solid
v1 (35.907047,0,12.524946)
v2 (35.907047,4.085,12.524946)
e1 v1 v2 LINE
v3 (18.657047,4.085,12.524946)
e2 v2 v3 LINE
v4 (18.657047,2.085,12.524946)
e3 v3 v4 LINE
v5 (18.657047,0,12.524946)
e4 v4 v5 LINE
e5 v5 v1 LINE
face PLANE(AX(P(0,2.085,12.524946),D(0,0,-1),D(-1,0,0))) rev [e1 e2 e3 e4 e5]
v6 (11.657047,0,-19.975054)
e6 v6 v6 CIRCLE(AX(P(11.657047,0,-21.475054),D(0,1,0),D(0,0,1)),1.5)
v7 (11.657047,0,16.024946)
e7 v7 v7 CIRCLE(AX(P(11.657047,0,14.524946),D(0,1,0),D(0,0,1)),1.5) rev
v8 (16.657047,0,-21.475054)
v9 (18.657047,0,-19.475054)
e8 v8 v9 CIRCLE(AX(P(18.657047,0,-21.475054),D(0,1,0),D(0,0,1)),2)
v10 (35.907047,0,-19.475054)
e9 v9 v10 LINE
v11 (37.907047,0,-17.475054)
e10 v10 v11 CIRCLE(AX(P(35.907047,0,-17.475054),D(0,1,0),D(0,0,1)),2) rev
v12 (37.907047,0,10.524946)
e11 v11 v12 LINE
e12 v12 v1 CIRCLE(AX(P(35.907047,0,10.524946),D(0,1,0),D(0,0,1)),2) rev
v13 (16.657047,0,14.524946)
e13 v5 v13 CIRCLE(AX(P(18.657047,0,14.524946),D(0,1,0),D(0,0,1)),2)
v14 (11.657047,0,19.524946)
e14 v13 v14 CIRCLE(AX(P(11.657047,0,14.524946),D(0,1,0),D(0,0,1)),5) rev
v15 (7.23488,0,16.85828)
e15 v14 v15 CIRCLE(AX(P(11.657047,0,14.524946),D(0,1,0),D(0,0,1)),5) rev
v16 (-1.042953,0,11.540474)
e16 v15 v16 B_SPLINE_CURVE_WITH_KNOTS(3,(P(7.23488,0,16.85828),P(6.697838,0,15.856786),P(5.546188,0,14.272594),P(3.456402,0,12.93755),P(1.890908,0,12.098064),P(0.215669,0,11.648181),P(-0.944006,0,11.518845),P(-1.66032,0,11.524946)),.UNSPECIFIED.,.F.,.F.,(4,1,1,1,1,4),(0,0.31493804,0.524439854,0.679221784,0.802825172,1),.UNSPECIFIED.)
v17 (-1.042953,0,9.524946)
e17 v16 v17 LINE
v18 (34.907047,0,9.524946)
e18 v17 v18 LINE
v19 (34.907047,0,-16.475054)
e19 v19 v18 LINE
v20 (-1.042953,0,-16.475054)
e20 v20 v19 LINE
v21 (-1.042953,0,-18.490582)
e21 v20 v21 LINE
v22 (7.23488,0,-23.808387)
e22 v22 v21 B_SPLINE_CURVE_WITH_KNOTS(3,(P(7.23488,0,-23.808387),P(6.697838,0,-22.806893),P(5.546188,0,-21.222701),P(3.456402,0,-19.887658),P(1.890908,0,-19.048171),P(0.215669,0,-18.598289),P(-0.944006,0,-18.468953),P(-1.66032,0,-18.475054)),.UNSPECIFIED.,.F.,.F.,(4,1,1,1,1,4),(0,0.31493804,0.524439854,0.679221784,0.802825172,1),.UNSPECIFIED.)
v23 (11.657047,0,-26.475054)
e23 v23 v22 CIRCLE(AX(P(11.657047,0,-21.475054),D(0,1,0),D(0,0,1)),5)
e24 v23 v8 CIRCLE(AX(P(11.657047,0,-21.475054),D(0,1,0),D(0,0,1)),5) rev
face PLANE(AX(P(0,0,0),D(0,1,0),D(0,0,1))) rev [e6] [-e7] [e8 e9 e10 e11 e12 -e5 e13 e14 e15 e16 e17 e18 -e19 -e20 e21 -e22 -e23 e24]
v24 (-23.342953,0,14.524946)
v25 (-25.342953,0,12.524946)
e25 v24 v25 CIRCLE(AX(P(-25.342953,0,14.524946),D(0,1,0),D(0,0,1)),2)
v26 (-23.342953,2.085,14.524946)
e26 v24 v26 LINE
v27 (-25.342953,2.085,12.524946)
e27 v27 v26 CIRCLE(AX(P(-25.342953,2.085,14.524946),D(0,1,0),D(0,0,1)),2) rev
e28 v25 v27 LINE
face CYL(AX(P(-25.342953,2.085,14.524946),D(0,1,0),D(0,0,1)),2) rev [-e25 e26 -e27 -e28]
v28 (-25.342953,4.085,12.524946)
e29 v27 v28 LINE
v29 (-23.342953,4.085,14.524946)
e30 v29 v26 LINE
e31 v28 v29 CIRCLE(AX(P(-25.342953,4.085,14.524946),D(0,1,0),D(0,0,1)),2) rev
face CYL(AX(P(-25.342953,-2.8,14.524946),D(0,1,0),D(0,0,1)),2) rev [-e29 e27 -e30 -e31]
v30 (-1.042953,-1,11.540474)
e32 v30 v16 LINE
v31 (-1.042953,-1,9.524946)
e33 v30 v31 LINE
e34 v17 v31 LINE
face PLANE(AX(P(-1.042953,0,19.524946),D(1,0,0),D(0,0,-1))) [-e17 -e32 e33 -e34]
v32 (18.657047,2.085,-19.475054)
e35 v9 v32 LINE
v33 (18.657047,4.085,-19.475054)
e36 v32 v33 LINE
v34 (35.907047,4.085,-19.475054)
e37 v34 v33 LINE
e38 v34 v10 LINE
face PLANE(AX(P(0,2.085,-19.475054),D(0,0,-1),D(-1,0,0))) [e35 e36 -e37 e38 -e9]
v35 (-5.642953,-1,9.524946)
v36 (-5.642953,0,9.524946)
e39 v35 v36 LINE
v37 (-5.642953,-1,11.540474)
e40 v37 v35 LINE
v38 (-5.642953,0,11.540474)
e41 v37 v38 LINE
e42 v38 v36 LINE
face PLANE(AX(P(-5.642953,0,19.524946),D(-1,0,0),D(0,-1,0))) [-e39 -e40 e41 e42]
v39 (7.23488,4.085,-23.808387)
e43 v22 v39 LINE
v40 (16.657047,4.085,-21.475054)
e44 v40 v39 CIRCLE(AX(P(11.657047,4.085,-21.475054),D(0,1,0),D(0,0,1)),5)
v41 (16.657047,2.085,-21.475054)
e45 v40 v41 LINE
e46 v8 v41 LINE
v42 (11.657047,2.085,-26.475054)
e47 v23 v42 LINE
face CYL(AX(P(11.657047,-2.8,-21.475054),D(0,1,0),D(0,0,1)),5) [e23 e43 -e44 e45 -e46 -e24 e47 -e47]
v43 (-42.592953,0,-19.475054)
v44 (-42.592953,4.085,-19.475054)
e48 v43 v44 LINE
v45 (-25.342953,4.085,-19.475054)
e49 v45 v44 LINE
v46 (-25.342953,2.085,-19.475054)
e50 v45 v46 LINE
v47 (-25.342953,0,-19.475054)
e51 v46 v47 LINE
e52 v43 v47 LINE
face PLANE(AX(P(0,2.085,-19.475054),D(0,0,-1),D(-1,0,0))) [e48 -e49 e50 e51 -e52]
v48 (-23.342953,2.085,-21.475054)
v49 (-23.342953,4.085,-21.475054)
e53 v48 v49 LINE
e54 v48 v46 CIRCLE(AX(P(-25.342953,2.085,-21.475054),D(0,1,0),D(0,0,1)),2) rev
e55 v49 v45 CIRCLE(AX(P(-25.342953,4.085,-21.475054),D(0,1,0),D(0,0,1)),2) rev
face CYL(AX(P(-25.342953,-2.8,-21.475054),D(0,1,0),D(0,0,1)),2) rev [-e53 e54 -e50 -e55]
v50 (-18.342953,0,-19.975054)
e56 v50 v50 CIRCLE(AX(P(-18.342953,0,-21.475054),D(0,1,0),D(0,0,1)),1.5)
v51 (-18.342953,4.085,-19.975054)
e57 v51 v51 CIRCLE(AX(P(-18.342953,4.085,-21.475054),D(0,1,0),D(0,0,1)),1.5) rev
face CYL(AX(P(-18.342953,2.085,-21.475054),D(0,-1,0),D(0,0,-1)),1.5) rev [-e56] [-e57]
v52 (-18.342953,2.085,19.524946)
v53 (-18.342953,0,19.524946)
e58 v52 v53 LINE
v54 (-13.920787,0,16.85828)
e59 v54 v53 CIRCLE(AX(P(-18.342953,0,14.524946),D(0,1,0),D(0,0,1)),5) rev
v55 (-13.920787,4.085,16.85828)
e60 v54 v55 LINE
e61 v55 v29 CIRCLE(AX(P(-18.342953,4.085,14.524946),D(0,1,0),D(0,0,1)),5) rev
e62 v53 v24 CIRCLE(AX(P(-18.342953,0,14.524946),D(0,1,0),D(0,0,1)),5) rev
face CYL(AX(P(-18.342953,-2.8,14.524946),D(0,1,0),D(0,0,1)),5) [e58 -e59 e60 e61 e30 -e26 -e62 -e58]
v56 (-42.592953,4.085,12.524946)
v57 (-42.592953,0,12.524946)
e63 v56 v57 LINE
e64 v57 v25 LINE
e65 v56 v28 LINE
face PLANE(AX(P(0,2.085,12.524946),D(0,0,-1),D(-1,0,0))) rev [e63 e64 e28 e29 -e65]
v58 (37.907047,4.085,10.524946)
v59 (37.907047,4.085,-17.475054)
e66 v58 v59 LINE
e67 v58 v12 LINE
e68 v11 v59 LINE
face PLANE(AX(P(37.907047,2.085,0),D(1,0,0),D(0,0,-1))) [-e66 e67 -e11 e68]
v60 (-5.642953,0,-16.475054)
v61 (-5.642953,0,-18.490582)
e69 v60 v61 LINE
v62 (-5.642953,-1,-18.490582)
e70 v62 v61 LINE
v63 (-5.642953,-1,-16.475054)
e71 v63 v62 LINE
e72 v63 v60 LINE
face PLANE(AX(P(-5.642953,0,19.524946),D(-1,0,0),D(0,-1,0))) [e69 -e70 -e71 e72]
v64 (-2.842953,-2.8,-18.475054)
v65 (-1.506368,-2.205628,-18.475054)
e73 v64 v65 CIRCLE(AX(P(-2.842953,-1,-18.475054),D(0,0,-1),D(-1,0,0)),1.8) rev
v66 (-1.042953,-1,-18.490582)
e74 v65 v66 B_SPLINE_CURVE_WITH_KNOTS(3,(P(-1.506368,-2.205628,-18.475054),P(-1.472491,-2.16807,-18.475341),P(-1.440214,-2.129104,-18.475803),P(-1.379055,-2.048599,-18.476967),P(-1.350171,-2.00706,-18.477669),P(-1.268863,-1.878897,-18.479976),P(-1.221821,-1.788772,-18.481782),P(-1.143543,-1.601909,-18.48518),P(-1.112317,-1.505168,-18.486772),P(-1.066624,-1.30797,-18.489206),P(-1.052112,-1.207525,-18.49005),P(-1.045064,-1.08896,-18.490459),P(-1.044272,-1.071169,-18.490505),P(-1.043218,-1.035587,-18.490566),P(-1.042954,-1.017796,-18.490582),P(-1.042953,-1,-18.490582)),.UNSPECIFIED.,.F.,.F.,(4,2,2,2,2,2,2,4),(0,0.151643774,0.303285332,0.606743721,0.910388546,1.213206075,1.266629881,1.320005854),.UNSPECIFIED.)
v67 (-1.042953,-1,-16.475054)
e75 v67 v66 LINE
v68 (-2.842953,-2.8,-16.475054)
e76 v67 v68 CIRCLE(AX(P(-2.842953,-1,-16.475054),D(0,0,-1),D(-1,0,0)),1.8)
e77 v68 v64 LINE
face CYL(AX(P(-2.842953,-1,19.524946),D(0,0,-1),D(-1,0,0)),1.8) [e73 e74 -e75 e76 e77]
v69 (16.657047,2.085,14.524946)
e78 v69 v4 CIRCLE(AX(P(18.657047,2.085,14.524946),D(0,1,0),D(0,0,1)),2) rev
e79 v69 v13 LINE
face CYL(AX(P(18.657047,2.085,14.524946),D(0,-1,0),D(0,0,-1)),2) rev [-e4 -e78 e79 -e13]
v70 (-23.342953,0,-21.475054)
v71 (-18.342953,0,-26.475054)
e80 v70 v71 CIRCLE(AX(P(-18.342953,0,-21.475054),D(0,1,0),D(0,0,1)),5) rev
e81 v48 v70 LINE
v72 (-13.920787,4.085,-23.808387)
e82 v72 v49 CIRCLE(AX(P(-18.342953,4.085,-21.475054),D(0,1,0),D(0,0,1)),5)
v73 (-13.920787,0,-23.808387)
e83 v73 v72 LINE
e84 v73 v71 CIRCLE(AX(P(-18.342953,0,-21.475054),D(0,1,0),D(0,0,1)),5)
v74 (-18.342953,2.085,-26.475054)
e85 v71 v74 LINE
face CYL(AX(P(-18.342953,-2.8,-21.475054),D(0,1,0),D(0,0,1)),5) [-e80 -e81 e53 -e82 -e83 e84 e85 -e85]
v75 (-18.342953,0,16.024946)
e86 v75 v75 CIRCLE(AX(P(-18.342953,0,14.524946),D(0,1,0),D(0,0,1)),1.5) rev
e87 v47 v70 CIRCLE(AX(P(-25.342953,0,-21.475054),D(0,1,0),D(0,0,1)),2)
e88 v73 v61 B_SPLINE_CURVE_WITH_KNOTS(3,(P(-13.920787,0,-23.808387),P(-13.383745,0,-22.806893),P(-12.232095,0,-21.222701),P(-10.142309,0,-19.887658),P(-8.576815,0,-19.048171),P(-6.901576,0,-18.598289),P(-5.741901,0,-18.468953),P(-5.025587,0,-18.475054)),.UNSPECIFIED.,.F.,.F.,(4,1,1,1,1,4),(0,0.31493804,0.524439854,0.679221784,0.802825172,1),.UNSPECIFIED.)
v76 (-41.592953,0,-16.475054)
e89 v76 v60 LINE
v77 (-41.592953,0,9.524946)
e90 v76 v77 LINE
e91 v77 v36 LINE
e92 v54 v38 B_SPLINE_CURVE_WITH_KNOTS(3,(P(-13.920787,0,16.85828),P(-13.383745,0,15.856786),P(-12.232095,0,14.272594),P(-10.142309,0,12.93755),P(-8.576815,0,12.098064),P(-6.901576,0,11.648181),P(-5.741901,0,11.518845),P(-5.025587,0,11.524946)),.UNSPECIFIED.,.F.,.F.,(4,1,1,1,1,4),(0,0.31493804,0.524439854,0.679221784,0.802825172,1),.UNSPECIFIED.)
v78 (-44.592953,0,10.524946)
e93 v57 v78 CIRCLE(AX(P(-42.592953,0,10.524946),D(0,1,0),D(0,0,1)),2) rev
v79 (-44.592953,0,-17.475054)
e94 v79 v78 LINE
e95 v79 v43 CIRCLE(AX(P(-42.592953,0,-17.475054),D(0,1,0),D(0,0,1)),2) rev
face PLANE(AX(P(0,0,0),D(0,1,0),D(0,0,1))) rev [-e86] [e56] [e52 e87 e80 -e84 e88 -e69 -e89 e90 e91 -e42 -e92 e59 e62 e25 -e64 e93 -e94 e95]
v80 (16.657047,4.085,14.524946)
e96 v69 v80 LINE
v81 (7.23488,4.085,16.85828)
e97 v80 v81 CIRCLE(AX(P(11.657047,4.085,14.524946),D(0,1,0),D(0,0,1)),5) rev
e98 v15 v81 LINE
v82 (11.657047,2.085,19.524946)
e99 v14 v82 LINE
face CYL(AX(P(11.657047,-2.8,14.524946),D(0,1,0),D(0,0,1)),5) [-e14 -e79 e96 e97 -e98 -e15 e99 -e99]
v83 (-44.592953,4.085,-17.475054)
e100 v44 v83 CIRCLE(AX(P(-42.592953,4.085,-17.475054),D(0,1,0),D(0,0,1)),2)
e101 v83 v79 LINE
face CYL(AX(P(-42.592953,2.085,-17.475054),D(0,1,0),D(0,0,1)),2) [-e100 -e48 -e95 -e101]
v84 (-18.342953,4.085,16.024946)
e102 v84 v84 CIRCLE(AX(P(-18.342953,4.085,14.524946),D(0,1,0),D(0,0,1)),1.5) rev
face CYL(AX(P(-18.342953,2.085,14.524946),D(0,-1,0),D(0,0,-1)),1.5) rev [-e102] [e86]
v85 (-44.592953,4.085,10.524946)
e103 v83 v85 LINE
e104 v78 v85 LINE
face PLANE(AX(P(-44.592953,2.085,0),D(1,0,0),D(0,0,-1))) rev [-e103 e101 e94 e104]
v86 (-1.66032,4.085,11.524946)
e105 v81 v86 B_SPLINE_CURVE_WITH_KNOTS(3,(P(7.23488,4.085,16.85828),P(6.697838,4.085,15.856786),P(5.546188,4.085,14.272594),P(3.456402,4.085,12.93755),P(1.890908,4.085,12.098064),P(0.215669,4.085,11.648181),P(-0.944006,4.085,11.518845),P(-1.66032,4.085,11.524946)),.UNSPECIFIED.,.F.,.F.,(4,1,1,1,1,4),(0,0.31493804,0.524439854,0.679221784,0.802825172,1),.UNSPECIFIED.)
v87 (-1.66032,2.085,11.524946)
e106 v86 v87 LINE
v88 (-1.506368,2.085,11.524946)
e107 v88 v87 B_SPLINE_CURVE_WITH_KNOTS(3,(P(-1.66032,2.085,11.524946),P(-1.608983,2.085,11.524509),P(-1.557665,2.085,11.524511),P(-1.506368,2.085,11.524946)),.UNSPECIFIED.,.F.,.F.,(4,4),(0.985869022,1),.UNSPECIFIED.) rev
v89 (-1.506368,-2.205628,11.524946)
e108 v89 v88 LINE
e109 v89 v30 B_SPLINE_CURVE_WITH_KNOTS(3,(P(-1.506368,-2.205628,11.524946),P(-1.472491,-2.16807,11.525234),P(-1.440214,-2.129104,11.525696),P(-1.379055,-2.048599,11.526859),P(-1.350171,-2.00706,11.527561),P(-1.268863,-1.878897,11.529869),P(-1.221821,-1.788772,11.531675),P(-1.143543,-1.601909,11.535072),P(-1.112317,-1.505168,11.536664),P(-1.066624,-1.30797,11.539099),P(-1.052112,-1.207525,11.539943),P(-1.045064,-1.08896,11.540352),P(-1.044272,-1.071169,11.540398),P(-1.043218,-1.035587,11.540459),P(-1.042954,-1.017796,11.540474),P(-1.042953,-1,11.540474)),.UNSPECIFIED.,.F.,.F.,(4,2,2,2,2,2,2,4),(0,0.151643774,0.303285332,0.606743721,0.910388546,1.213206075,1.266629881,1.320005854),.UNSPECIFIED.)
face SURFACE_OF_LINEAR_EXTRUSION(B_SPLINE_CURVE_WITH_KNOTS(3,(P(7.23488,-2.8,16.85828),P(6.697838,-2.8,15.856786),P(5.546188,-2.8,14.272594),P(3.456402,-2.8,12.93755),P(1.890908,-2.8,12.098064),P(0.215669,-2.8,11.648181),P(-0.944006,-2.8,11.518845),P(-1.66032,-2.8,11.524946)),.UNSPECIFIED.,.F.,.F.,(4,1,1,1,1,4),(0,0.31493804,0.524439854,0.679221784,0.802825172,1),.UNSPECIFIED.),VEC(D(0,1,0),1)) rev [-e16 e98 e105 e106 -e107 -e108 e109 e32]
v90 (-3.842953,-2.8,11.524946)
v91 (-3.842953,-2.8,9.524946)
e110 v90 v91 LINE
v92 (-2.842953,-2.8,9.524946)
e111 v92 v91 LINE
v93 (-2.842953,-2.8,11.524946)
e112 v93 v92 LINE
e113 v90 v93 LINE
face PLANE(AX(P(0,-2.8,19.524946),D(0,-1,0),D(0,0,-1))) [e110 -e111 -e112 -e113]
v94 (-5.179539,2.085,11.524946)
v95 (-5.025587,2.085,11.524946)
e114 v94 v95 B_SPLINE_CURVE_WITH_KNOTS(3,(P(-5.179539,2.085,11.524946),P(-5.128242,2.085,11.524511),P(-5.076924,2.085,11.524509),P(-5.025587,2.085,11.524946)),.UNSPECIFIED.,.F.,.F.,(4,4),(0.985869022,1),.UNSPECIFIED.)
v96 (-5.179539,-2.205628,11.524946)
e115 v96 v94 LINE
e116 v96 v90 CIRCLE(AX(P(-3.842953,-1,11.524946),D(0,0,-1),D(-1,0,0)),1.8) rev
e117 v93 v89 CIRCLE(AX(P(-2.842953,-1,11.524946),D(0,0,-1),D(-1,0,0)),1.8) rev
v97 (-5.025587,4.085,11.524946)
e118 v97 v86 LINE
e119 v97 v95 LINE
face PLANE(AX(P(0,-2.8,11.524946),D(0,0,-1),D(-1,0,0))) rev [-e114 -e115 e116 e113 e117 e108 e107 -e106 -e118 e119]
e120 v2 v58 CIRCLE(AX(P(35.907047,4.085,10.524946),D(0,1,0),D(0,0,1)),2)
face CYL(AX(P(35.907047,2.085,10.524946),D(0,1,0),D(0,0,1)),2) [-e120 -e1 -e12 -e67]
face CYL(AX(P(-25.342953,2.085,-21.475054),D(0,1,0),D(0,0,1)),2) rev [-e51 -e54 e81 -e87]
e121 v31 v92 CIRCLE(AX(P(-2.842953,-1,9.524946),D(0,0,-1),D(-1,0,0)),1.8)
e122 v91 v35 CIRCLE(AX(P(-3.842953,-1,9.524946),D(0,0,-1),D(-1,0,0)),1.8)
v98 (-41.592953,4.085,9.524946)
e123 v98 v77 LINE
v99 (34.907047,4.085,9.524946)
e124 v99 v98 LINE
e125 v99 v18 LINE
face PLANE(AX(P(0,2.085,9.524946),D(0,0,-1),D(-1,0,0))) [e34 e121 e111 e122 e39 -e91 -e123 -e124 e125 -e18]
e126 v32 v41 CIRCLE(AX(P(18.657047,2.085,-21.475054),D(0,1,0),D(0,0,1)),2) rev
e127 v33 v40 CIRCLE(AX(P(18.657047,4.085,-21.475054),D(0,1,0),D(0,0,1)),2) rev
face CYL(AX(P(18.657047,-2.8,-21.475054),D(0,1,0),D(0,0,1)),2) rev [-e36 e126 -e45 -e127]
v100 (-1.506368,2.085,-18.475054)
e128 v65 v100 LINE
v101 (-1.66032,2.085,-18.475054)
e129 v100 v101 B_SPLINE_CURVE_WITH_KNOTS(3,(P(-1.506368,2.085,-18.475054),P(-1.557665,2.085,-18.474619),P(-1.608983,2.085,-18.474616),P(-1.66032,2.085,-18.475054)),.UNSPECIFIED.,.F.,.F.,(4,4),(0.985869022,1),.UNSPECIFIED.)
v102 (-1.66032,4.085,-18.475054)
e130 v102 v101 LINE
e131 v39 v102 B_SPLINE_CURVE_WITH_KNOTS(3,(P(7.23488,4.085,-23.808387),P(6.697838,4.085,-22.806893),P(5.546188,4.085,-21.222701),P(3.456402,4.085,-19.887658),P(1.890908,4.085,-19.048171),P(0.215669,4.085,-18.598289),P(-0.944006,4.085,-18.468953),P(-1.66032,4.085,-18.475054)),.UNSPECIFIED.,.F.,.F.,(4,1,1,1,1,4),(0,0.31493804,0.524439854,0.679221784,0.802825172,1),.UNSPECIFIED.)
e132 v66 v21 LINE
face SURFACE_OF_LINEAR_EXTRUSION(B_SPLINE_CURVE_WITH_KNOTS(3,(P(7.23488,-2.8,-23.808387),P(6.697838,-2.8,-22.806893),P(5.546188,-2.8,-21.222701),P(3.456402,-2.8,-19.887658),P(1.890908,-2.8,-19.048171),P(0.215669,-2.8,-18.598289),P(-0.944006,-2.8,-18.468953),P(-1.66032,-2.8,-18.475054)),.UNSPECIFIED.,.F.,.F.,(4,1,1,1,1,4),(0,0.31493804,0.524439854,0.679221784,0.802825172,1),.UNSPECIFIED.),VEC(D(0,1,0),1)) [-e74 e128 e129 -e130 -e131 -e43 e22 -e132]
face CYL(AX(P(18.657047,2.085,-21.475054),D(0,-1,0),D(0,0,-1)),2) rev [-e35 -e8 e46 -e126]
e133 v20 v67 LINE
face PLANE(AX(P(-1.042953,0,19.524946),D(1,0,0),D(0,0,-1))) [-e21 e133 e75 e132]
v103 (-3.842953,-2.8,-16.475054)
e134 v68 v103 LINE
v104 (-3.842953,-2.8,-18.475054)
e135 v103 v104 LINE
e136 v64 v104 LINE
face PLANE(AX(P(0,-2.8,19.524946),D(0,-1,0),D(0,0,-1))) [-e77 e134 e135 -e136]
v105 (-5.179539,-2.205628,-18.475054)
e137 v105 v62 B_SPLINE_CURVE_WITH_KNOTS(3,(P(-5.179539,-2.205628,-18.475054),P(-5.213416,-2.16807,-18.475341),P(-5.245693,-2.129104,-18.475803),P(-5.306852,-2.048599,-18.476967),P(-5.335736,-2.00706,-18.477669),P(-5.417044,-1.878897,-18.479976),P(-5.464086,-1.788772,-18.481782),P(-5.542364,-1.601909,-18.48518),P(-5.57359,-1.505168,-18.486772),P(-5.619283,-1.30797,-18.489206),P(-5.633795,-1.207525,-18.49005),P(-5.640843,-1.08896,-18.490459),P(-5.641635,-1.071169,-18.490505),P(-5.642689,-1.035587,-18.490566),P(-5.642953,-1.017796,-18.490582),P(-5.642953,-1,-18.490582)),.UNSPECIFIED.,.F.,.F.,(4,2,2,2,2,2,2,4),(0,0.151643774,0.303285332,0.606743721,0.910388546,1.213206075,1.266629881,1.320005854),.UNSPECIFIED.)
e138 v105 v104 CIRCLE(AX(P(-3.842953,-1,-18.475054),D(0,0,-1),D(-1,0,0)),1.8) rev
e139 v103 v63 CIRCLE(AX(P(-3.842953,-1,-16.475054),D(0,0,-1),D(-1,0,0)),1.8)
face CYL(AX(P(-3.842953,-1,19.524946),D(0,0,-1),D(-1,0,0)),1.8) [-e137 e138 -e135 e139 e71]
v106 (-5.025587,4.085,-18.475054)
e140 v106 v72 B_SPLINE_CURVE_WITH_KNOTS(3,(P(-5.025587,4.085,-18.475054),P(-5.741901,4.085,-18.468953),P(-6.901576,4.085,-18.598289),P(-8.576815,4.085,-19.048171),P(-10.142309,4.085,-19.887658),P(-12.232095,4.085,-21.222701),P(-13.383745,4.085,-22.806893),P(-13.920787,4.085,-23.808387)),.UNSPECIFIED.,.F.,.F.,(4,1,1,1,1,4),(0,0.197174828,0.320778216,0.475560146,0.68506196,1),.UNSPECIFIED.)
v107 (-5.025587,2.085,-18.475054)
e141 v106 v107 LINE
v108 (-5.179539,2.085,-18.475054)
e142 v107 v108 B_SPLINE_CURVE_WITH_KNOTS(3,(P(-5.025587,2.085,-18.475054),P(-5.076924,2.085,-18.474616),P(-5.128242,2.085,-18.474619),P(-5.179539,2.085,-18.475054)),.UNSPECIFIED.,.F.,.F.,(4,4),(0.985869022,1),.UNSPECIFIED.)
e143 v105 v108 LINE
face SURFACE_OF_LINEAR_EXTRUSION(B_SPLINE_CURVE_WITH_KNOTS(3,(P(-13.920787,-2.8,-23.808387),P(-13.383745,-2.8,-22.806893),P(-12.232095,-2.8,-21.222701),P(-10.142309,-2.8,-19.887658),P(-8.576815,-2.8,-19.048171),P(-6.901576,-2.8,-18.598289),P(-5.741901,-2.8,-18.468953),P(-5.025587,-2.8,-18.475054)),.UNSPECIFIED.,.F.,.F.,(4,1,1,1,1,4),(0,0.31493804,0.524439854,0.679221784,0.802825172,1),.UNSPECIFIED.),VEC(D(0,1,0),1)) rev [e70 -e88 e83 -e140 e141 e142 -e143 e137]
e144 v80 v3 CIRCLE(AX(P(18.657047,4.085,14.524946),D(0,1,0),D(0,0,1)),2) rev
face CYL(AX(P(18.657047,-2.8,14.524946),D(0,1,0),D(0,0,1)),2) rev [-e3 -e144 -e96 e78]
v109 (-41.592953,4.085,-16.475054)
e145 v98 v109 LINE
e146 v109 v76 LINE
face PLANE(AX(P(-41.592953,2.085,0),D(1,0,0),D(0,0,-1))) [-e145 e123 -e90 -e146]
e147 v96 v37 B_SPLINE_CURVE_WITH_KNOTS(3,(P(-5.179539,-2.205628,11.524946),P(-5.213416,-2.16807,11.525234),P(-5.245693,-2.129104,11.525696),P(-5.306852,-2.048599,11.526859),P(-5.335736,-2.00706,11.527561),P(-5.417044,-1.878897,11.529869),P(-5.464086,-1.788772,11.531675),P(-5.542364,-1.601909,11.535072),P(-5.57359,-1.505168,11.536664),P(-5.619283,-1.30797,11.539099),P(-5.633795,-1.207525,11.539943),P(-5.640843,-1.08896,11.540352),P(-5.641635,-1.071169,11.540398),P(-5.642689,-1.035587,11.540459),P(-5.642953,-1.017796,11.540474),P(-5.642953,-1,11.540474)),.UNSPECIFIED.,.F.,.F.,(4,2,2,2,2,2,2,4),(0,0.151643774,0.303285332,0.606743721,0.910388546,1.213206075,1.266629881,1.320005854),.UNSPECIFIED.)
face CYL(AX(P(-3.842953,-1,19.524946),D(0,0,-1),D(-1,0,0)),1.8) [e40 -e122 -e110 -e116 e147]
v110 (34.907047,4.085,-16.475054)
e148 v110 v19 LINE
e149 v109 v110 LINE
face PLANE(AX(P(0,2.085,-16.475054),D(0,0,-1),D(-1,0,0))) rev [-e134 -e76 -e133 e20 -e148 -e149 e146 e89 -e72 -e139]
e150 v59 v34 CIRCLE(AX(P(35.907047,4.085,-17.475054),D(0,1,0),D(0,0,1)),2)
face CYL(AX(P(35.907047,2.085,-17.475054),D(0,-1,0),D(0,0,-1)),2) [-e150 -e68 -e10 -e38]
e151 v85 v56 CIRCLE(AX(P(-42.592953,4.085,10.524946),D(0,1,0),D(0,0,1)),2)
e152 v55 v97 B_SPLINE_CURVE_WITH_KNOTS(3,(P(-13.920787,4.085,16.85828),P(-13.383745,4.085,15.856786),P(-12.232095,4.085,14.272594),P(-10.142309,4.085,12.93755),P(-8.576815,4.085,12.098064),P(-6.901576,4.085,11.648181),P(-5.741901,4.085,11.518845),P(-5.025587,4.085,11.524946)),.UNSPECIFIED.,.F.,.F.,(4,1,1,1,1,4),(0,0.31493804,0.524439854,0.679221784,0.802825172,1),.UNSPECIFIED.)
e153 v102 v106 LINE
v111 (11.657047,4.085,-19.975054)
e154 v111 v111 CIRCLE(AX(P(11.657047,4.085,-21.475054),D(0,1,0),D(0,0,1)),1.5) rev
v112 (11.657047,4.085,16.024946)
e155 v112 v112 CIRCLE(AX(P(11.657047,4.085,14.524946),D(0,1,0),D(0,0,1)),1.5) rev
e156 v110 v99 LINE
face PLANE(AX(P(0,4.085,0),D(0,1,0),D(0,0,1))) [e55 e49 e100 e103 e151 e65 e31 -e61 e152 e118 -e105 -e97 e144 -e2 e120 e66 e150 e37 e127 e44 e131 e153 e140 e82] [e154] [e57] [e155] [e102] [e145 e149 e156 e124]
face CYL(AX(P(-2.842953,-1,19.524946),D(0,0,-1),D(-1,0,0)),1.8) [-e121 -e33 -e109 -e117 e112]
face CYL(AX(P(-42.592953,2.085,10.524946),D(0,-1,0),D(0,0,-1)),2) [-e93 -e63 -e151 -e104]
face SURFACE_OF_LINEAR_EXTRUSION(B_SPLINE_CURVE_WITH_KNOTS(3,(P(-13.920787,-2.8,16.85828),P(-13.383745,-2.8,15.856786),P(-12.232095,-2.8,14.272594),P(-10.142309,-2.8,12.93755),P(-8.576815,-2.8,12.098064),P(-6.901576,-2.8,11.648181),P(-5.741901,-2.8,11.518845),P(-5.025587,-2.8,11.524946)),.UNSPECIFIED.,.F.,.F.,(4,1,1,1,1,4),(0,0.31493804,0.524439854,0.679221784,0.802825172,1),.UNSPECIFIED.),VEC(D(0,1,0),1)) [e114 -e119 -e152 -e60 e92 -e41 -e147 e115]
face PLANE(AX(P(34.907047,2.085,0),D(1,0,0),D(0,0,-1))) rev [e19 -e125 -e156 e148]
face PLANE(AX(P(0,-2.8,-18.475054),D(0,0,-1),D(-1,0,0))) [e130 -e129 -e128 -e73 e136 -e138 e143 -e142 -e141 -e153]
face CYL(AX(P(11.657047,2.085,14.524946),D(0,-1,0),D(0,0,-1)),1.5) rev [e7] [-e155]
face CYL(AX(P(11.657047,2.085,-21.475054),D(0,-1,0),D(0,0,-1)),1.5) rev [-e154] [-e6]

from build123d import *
from build123d.topology import SkipClean

# Parameters (mm, degrees)
SKETCH1_W           = 40
SKETCH1_H           = 7
SKETCH1_R           = 1.5
SKETCH1_W_2         = 82.5
SKETCH1_H_2         = 32
SKETCH1_W_3         = 76.5
SKETCH1_H_3         = 26
BOSS_EXTRUDE1_DEPTH = 2.085
SKETCH2_W           = 5
SKETCH2_H           = 10
BOSS_EXTRUDE2_DEPTH = 3
FILLET1_R           = 2
FILLET2_R           = 2
CUT_EXTRUDE1_DEPTH  = 65.136818612
SKETCH4_W           = 30
SKETCH4_H           = 6.817038716
CUT_EXTRUDE2_DEPTH  = 53.089568977
FILLET3_R           = 5
FILLET4_R           = 2
BOSS_EXTRUDE3_START = 2
SKETCH5_R           = 1.5
BOSS_EXTRUDE3_DEPTH = 2
FILLET5_START       = 2.085
FILLET5_DEPTH       = 2


with BuildPart() as part:
    # Sketch1 → Boss-Extrude1 (new body)
    # profile 1 of 3: a face of its own
    with BuildSketch(Plane(origin=(0, 0, 0), x_dir=(1, 0, 0), z_dir=(0, 1, 0))):
        with Locations((-3.342953498, -16.024946279)):
            Rectangle(SKETCH1_W, SKETCH1_H)
        with Locations(Location((-18.342953498, -14.524946279, 0), (0, 0, 270))):
            Circle(SKETCH1_R, mode=Mode.SUBTRACT)
        with Locations(Location((11.657046502, -14.524946279, 0), (0, 0, 270))):
            Circle(SKETCH1_R, mode=Mode.SUBTRACT)
    # profile 2 of 3: a face of its own
    with BuildSketch(Plane(origin=(0, 0, 0), x_dir=(1, 0, 0), z_dir=(0, 1, 0))):
        with Locations((-3.342953498, 3.475053721)):
            Rectangle(SKETCH1_W_2, SKETCH1_H_2)
        with Locations((-3.342953498, 3.475053721)):
            Rectangle(SKETCH1_W_3, SKETCH1_H_3, mode=Mode.SUBTRACT)
    # profile 3 of 3: a face of its own
    with BuildSketch(Plane(origin=(0, 0, 0), x_dir=(1, 0, 0), z_dir=(0, 1, 0))):
        with Locations((-3.342953498, 22.975053721)):
            Rectangle(SKETCH1_W, SKETCH1_H)
        with Locations(Location((-18.342953498, 21.475053721, 0), (0, 0, 270))):
            Circle(SKETCH1_R, mode=Mode.SUBTRACT)
        with Locations(Location((11.657046502, 21.475053721, 0), (0, 0, 270))):
            Circle(SKETCH1_R, mode=Mode.SUBTRACT)
    extrude(amount=BOSS_EXTRUDE1_DEPTH)

    # Sketch2 → Boss-Extrude2 (add)
    with BuildSketch(Plane.XZ):
        with Locations((-3.342953498, 14.524946279)):
            Rectangle(SKETCH2_W, SKETCH2_H)
        with Locations((-3.342953498, -21.475053721)):
            Rectangle(SKETCH2_W, SKETCH2_H)
    extrude(amount=BOSS_EXTRUDE2_DEPTH)

    # Fillet1
    fillet1_edges = [part.edges().sort_by_distance(p)[0] for p in [
        (-5.842953498, -3, 14.524946279),
        (-0.842953498, -3, 14.524946279),
        (-0.842953498, -3, -21.475053721),
        (-5.842953498, -3, -21.475053721),
    ]]
    fillet(fillet1_edges, radius=FILLET1_R)

    # Fillet2
    fillet2_edges = [part.edges().sort_by_distance(p)[0] for p in [
        (-44.592953498, 1.0425, 12.524946279),
        (-44.592953498, 1.0425, -19.475053721),
        (37.907046502, 1.0425, -19.475053721),
        (37.907046502, 1.0425, 12.524946279),
    ]]
    fillet(fillet2_edges, radius=FILLET2_R)

    # Sketch3 → Cut-Extrude1 (cut, through all)
    with BuildSketch(Plane(origin=(0, 0, -26.475053721), x_dir=(-1, 0, 0), z_dir=(0, 0, -1))):
        with BuildLine():
            Line((5.842953498, -1), (5.842953498, 0))
            Line((5.842953498, 0), (5.642953498, 0))
            Line((5.642953498, 0), (5.642953498, -1))
            ThreePointArc((5.642953498, -1), (5.115745704, -2.272792206), (3.842953498, -2.8))
            Line((3.842953498, -2.8), (2.842953498, -2.8))
            ThreePointArc((2.842953498, -2.8), (1.570161291, -2.272792206), (1.042953498, -1))
            Line((1.042953498, -1), (1.042953498, 0))
            Line((1.042953498, 0), (0.842953498, 0))
            Line((0.842953498, 0), (0.842953498, -1))
            ThreePointArc((0.842953498, -1), (1.428739935, -2.414213562), (2.842953498, -3))
            Line((2.842953498, -3), (3.842953498, -3))
            ThreePointArc((3.842953498, -3), (5.25716706, -2.414213562), (5.842953498, -1))
        make_face()
    extrude(amount=-CUT_EXTRUDE1_DEPTH, mode=Mode.SUBTRACT)

    # Sketch4 → Cut-Extrude2 (cut, through all)
    with BuildSketch(Plane(origin=(0, 2.085, 0), x_dir=(1, 0, 0), z_dir=(0, 1, 0))):
        with BuildLine():
            Line((-5.025587433, 18.475053721), (-3.342953498, 18.475053721))
            Line((-3.342953498, 18.475053721), (-1.660319563, 18.475053721))
            Line((-1.660319563, 18.475053721), (-1.5063675, 18.475053721))
            add(Edge.make_bspline(
                [(7.234880115, 23.808387054), (6.697838422, 22.80689338), (5.54618786, 21.222701251), (3.456402004, 19.887657692), (1.890908212, 19.048171258), (0.265447838, 18.611656881), (-0.841891354, 18.480685845), (-1.5063675, 18.475053721)],
                knots=[0, 0, 0, 0, 0.31493804, 0.524439854, 0.679221784, 0.802825172, 0.985869019, 0.985869019, 0.985869019, 0.985869019], degree=3))
            ThreePointArc((7.234880115, 23.808387054), (9.075057605, 25.756797914), (11.657046502, 26.475053721))
            Line((11.657046502, 26.475053721), (-18.342953498, 26.475053721))
            ThreePointArc((-18.342953498, 26.475053721), (-15.7609646, 25.756797914), (-13.92078711, 23.808387054))
            add(Edge.make_bspline(
                [(-13.92078711, 23.808387054), (-13.383745417, 22.80689338), (-12.232094855, 21.222701251), (-10.142308999, 19.887657692), (-8.576815207, 19.048171258), (-6.951354833, 18.611656881), (-5.844015641, 18.480685845), (-5.179539495, 18.475053721)],
                knots=[0, 0, 0, 0, 0.31493804, 0.524439854, 0.679221784, 0.802825172, 0.985869019, 0.985869019, 0.985869019, 0.985869019], degree=3))
            Line((-5.179539495, 18.475053721), (-5.025587433, 18.475053721))
        make_face()
        with Locations((-3.342953498, 29.883573079)):
            Rectangle(SKETCH4_W, SKETCH4_H)
        with BuildLine():
            ThreePointArc((-13.92078711, -16.858279612), (-15.7609646, -18.806690472), (-18.342953498, -19.524946279))
            Line((-18.342953498, -19.524946279), (11.657046502, -19.524946279))
            ThreePointArc((11.657046502, -19.524946279), (9.075057605, -18.806690472), (7.234880115, -16.858279612))
            add(Edge.make_bspline(
                [(7.234880115, -16.858279612), (6.697838422, -15.856785937), (5.54618786, -14.272593809), (3.456402004, -12.937550249), (1.890908212, -12.098063816), (0.265447838, -11.661549439), (-0.841891354, -11.530578403), (-1.5063675, -11.524946279)],
                knots=[0, 0, 0, 0, 0.31493804, 0.524439854, 0.679221784, 0.802825172, 0.985869019, 0.985869019, 0.985869019, 0.985869019], degree=3))
            Line((-1.5063675, -11.524946279), (-1.660319563, -11.524946279))
            Line((-1.660319563, -11.524946279), (-3.342953498, -11.524946279))
            Line((-3.342953498, -11.524946279), (-5.025587433, -11.524946279))
            Line((-5.025587433, -11.524946279), (-5.179539495, -11.524946279))
            add(Edge.make_bspline(
                [(-13.92078711, -16.858279612), (-13.383745417, -15.856785937), (-12.232094855, -14.272593809), (-10.142308999, -12.937550249), (-8.576815207, -12.098063816), (-6.951354833, -11.661549439), (-5.844015641, -11.530578403), (-5.179539495, -11.524946279)],
                knots=[0, 0, 0, 0, 0.31493804, 0.524439854, 0.679221784, 0.802825172, 0.985869019, 0.985869019, 0.985869019, 0.985869019], degree=3))
        make_face()
        with Locations((-3.342953498, -22.933465637)):
            Rectangle(SKETCH4_W, SKETCH4_H)
    extrude(amount=-CUT_EXTRUDE2_DEPTH, mode=Mode.SUBTRACT)

    # Fillet3
    fillet3_edges = [part.edges().sort_by_distance(p)[0] for p in [
        (16.657046502, 1.0425, -26.475053721),
        (-23.342953498, 1.0425, -26.475053721),
        (-23.342953498, 1.0425, 19.524946279),
        (16.657046502, 1.0425, 19.524946279),
    ]]
    fillet(fillet3_edges, radius=FILLET3_R - 0.0001)  # a hair under: the kernel refuses the full size

    # Fillet4
    fillet4_edges = [part.edges().sort_by_distance(p)[0] for p in [
        (-23.342953498, 1.0425, 12.524946279),
        (-23.342953498, 1.0425, -19.475053721),
        (16.657046502, 1.0425, -19.475053721),
        (16.657046502, 1.0425, 12.524946279),
    ]]
    fillet(fillet4_edges, radius=FILLET4_R)

    # Sketch5 → Boss-Extrude3 (add)
    # profile 1 of 26: a face of its own
    with SkipClean():  # the faces are left unmerged after this step: merging them gives an invalid solid
        with BuildSketch(Plane(origin=(0, 2.085, 0), x_dir=(1, 0, 0), z_dir=(0, 1, 0)).offset(BOSS_EXTRUDE3_START)):
            with BuildLine():
                ThreePointArc((-18.343003498, 26.475053721), (-21.878490939, 25.010584091), (-23.342953497, 21.475093721))
                ThreePointArc((-23.342953497, 21.475093721), (-23.237489148, 20.453525081), (-22.925529193, 19.475053721))
                Line((-22.925529193, 19.475053721), (-14.342953498, 19.475053721))
                Line((-14.342953498, 19.475053721), (-14.342953498, 24.475053721))
                ThreePointArc((-14.342953498, 24.475053721), (-16.106907881, 25.947200856), (-18.343003498, 26.475053721))
            make_face()
            with Locations((-18.342953498, 21.475053721)):
                Circle(SKETCH5_R, mode=Mode.SUBTRACT)
        # profile 2 of 26: a face of its own
        with BuildSketch(Plane(origin=(0, 2.085, 0), x_dir=(1, 0, 0), z_dir=(0, 1, 0)).offset(BOSS_EXTRUDE3_START)):
            with BuildLine():
                Line((-22.925529193, 19.475053721), (-23.342953498, 19.475053721))
                Line((-23.342953498, 19.475053721), (-23.342953498, 16.475053721))
                Line((-23.342953498, 16.475053721), (-18.342953499, 16.475053721))
                ThreePointArc((-18.342953499, 16.475053721), (-21.081566286, 17.291753589), (-22.925529193, 19.475053721))
            make_face()
        # profile 3 of 26: a face of its own
        with BuildSketch(Plane(origin=(0, 2.085, 0), x_dir=(1, 0, 0), z_dir=(0, 1, 0)).offset(BOSS_EXTRUDE3_START)):
            with BuildLine():
                Line((-23.342953498, 16.475053721), (-23.342953498, 19.475053721))
                Line((-23.342953498, 19.475053721), (-25.342953498, 19.475053721))
                Line((-25.342953498, 19.475053721), (-42.592953498, 19.475053721))
                ThreePointArc((-42.592953498, 19.475053721), (-44.00716706, 18.889267283), (-44.592953498, 17.475053721))
                Line((-44.592953498, 17.475053721), (-44.592953498, -10.524946279))
                ThreePointArc((-44.592953498, -10.524946279), (-44.00716706, -11.939159841), (-42.592953498, -12.524946279))
                Line((-42.592953498, -12.524946279), (-25.342953498, -12.524946279))
                Line((-25.342953498, -12.524946279), (-23.342953498, -12.524946279))
                Line((-23.342953498, -12.524946279), (-23.342953498, -9.524946279))
                Line((-23.342953498, -9.524946279), (-41.592953498, -9.524946279))
                Line((-41.592953498, -9.524946279), (-41.592953498, 16.475053721))
                Line((-41.592953498, 16.475053721), (-23.342953498, 16.475053721))
            make_face()
        # profile 4 of 26: a face of its own
        with BuildSketch(Plane(origin=(0, 2.085, 0), x_dir=(1, 0, 0), z_dir=(0, 1, 0)).offset(BOSS_EXTRUDE3_START)):
            with BuildLine():
                Line((-14.342953498, 19.475053721), (-22.925529193, 19.475053721))
                ThreePointArc((-22.925529193, 19.475053721), (-21.081566286, 17.291753589), (-18.342953499, 16.475053721))
                ThreePointArc((-18.342953499, 16.475053721), (-16.106885521, 17.002917766), (-14.342953498, 18.475053721))
                Line((-14.342953498, 18.475053721), (-14.342953498, 19.475053721))
            make_face()
        # profile 5 of 26: a face of its own
        with BuildSketch(Plane(origin=(0, 2.085, 0), x_dir=(1, 0, 0), z_dir=(0, 1, 0)).offset(BOSS_EXTRUDE3_START)):
            with BuildLine():
                ThreePointArc((-13.92078711, 23.808387054), (-14.118698205, 24.150061614), (-14.342953498, 24.475053721))
                Line((-14.342953498, 24.475053721), (-14.342953498, 19.475053721))
                Line((-14.342953498, 19.475053721), (-13.760377803, 19.475053721))
                ThreePointArc((-13.760377803, 19.475053721), (-13.448421933, 20.453505503), (-13.342953498, 21.475053721))
                ThreePointArc((-13.342953498, 21.475053721), (-13.489561285, 22.676962217), (-13.92078711, 23.808387054))
            make_face()
        # profile 6 of 26: a face of its own
        with BuildSketch(Plane(origin=(0, 2.085, 0), x_dir=(1, 0, 0), z_dir=(0, 1, 0)).offset(BOSS_EXTRUDE3_START)):
            with BuildLine():
                Line((-13.760377803, 19.475053721), (-14.342953498, 19.475053721))
                Line((-14.342953498, 19.475053721), (-14.342953498, 18.475053721))
                ThreePointArc((-14.342953498, 18.475053721), (-14.022635061, 18.958141206), (-13.760377803, 19.475053721))
            make_face()
        # profile 7 of 26: a face of its own
        with BuildSketch(Plane(origin=(0, 2.085, 0), x_dir=(1, 0, 0), z_dir=(0, 1, 0)).offset(BOSS_EXTRUDE3_START)):
            with BuildLine():
                ThreePointArc((-14.342953498, 18.475053721), (-16.106885521, 17.002917766), (-18.342953499, 16.475053721))
                Line((-18.342953499, 16.475053721), (11.657046523, 16.475053721))
                ThreePointArc((11.657046523, 16.475053721), (9.420978534, 17.002917762), (7.657046502, 18.475053721))
                Line((7.657046502, 18.475053721), (-1.5063675, 18.475053721))
                add(Edge.make_bspline(
                    [(-1.5063675, 18.475053721), (-1.557665042, 18.474618921), (-1.608983344, 18.47461649), (-1.660319563, 18.475053721)],
                    knots=[0.985869019, 0.985869019, 0.985869019, 0.985869019, 1, 1, 1, 1], degree=3))
                Line((-1.660319563, 18.475053721), (-3.342953498, 18.475053721))
                Line((-3.342953498, 18.475053721), (-5.025587433, 18.475053721))
                add(Edge.make_bspline(
                    [(-5.179539495, 18.475053721), (-5.128241953, 18.474618921), (-5.076923651, 18.47461649), (-5.025587433, 18.475053721)],
                    knots=[0.985869019, 0.985869019, 0.985869019, 0.985869019, 1, 1, 1, 1], degree=3))
                Line((-5.179539495, 18.475053721), (-14.342953498, 18.475053721))
            make_face()
        # profile 8 of 26: a face of its own
        with BuildSketch(Plane(origin=(0, 2.085, 0), x_dir=(1, 0, 0), z_dir=(0, 1, 0)).offset(BOSS_EXTRUDE3_START)):
            with BuildLine():
                add(Edge.make_bspline(
                    [(-13.92078711, 23.808387054), (-13.383745417, 22.80689338), (-12.232094855, 21.222701251), (-10.424029044, 20.067632367), (-9.557996846, 19.581589064), (-9.354549961, 19.475053721)],
                    knots=[0, 0, 0, 0, 0.31493804, 0.524439854, 0.587657191, 0.587657191, 0.587657191, 0.587657191], degree=3))
                ThreePointArc((-13.92078711, 23.808387054), (-13.489561285, 22.676962217), (-13.342953498, 21.475053721))
                ThreePointArc((-13.342953498, 21.475053721), (-13.448421933, 20.453505503), (-13.760377803, 19.475053721))
                Line((-13.760377803, 19.475053721), (-9.354549961, 19.475053721))
            make_face()
        # profile 9 of 26: a face of its own
        with BuildSketch(Plane(origin=(0, 2.085, 0), x_dir=(1, 0, 0), z_dir=(0, 1, 0)).offset(BOSS_EXTRUDE3_START)):
            with BuildLine():
                ThreePointArc((-13.760377803, 19.475053721), (-14.022635061, 18.958141206), (-14.342953498, 18.475053721))
                Line((-14.342953498, 18.475053721), (-5.179539495, 18.475053721))
                add(Edge.make_bspline(
                    [(-9.354549961, 19.475053721), (-9.059875559, 19.320746917), (-8.354121704, 18.98836733), (-6.951354833, 18.611656881), (-5.844015641, 18.480685845), (-5.179539495, 18.475053721)],
                    knots=[0.587657191, 0.587657191, 0.587657191, 0.587657191, 0.679221784, 0.802825172, 0.985869019, 0.985869019, 0.985869019, 0.985869019], degree=3))
                Line((-9.354549961, 19.475053721), (-13.760377803, 19.475053721))
            make_face()
        # profile 10 of 26: a face of its own
        with BuildSketch(Plane(origin=(0, 2.085, 0), x_dir=(1, 0, 0), z_dir=(0, 1, 0)).offset(BOSS_EXTRUDE3_START)):
            with BuildLine():
                ThreePointArc((16.239622197, 19.475053721), (14.395659298, 17.291753594), (11.657046523, 16.475053721))
                Line((11.657046523, 16.475053721), (16.657046502, 16.475053721))
                Line((16.657046502, 16.475053721), (16.657046502, 19.475053721))
                Line((16.657046502, 19.475053721), (16.239622197, 19.475053721))
            make_face()
        # profile 11 of 26: a face of its own
        with BuildSketch(Plane(origin=(0, 2.085, 0), x_dir=(1, 0, 0), z_dir=(0, 1, 0)).offset(BOSS_EXTRUDE3_START)):
            with BuildLine():
                ThreePointArc((7.657046502, 18.475053721), (9.420978534, 17.002917762), (11.657046523, 16.475053721))
                ThreePointArc((11.657046523, 16.475053721), (14.395659298, 17.291753594), (16.239622197, 19.475053721))
                Line((16.239622197, 19.475053721), (7.074470807, 19.475053721))
                ThreePointArc((7.074470807, 19.475053721), (7.336728066, 18.958141206), (7.657046502, 18.475053721))
            make_face()
        # profile 12 of 26: a face of its own
        with BuildSketch(Plane(origin=(0, 2.085, 0), x_dir=(1, 0, 0), z_dir=(0, 1, 0)).offset(BOSS_EXTRUDE3_START)):
            with BuildLine():
                Line((16.657046502, 19.475053721), (16.657046502, 16.475053721))
                Line((16.657046502, 16.475053721), (34.907046502, 16.475053721))
                Line((34.907046502, 16.475053721), (34.907046502, -9.524946279))
                Line((34.907046502, -9.524946279), (16.657046502, -9.524946279))
                Line((16.657046502, -9.524946279), (16.657046502, -12.524946279))
                Line((16.657046502, -12.524946279), (18.657046502, -12.524946279))
                Line((18.657046502, -12.524946279), (35.907046502, -12.524946279))
                ThreePointArc((35.907046502, -12.524946279), (37.321260065, -11.939159841), (37.907046502, -10.524946279))
                Line((37.907046502, -10.524946279), (37.907046502, 17.475053721))
                ThreePointArc((37.907046502, 17.475053721), (37.321260065, 18.889267283), (35.907046502, 19.475053721))
                Line((35.907046502, 19.475053721), (18.657046502, 19.475053721))
                Line((18.657046502, 19.475053721), (16.657046502, 19.475053721))
            make_face()
        # profile 13 of 26: a face of its own
        with BuildSketch(Plane(origin=(0, 2.085, 0), x_dir=(1, 0, 0), z_dir=(0, 1, 0)).offset(BOSS_EXTRUDE3_START)):
            with BuildLine():
                Line((-1.5063675, 18.475053721), (7.657046502, 18.475053721))
                ThreePointArc((7.657046502, 18.475053721), (7.336728066, 18.958141206), (7.074470807, 19.475053721))
                Line((7.074470807, 19.475053721), (2.668642966, 19.475053721))
                add(Edge.make_bspline(
                    [(2.668642966, 19.475053721), (2.373968563, 19.320746917), (1.668214709, 18.98836733), (0.265447838, 18.611656881), (-0.841891354, 18.480685845), (-1.5063675, 18.475053721)],
                    knots=[0.587657191, 0.587657191, 0.587657191, 0.587657191, 0.679221784, 0.802825172, 0.985869019, 0.985869019, 0.985869019, 0.985869019], degree=3))
            make_face()
        # profile 14 of 26: a face of its own
        with BuildSketch(Plane(origin=(0, 2.085, 0), x_dir=(1, 0, 0), z_dir=(0, 1, 0)).offset(BOSS_EXTRUDE3_START)):
            with BuildLine():
                Line((7.074470807, 19.475053721), (16.239622197, 19.475053721))
                ThreePointArc((16.239622197, 19.475053721), (16.551578067, 20.453505503), (16.657046502, 21.475053721))
                ThreePointArc((16.657046502, 21.475053721), (15.192598086, 25.010569949), (11.657096502, 26.475053721))
                ThreePointArc((11.657096502, 26.475053721), (9.075079014, 25.756810824), (7.234880115, 23.808387054))
                ThreePointArc((7.234880115, 23.808387054), (6.66046873, 21.660014702), (7.074470807, 19.475053721))
            make_face()
            with Locations((11.657046502, 21.475053721)):
                Circle(SKETCH5_R, mode=Mode.SUBTRACT)
        # profile 15 of 26: a face of its own
        with BuildSketch(Plane(origin=(0, 2.085, 0), x_dir=(1, 0, 0), z_dir=(0, 1, 0)).offset(BOSS_EXTRUDE3_START)):
            with BuildLine():
                Line((-18.342953493, -9.524946279), (-23.342953498, -9.524946279))
                Line((-23.342953498, -9.524946279), (-23.342953498, -12.524946279))
                Line((-23.342953498, -12.524946279), (-22.925529193, -12.524946279))
                ThreePointArc((-22.925529193, -12.524946279), (-21.081566283, -10.341646145), (-18.342953493, -9.524946279))
            make_face()
        # profile 16 of 26: a face of its own
        with BuildSketch(Plane(origin=(0, 2.085, 0), x_dir=(1, 0, 0), z_dir=(0, 1, 0)).offset(BOSS_EXTRUDE3_START)):
            with BuildLine():
                add(Edge.make_bspline(
                    [(7.234880115, 23.808387054), (6.697838422, 22.80689338), (5.54618786, 21.222701251), (3.738122049, 20.067632367), (2.872089851, 19.581589064), (2.668642966, 19.475053721)],
                    knots=[0, 0, 0, 0, 0.31493804, 0.524439854, 0.587657191, 0.587657191, 0.587657191, 0.587657191], degree=3))
                Line((2.668642966, 19.475053721), (7.074470807, 19.475053721))
                ThreePointArc((7.074470807, 19.475053721), (6.66046873, 21.660014702), (7.234880115, 23.808387054))
            make_face()
        # profile 17 of 26: a face of its own
        with BuildSketch(Plane(origin=(0, 2.085, 0), x_dir=(1, 0, 0), z_dir=(0, 1, 0)).offset(BOSS_EXTRUDE3_START)):
            with BuildLine():
                Line((11.657046502, -9.524946279), (-18.342953493, -9.524946279))
                ThreePointArc((-18.342953493, -9.524946279), (-16.106885518, -10.052810325), (-14.342953498, -11.524946279))
                Line((-14.342953498, -11.524946279), (-5.179539495, -11.524946279))
                add(Edge.make_bspline(
                    [(-5.179539495, -11.524946279), (-5.128241953, -11.524511479), (-5.076923651, -11.524509048), (-5.025587433, -11.524946279)],
                    knots=[0.985869019, 0.985869019, 0.985869019, 0.985869019, 1, 1, 1, 1], degree=3))
                Line((-5.025587433, -11.524946279), (-3.342953498, -11.524946279))
                Line((-3.342953498, -11.524946279), (-1.660319563, -11.524946279))
                add(Edge.make_bspline(
                    [(-1.5063675, -11.524946279), (-1.557665042, -11.524511479), (-1.608983344, -11.524509048), (-1.660319563, -11.524946279)],
                    knots=[0.985869019, 0.985869019, 0.985869019, 0.985869019, 1, 1, 1, 1], degree=3))
                Line((-1.5063675, -11.524946279), (7.657046502, -11.524946279))
                ThreePointArc((7.657046502, -11.524946279), (9.420978525, -10.052810324), (11.657046502, -9.524946279))
            make_face()
        # profile 18 of 26: a face of its own
        with BuildSketch(Plane(origin=(0, 2.085, 0), x_dir=(1, 0, 0), z_dir=(0, 1, 0)).offset(BOSS_EXTRUDE3_START)):
            with BuildLine():
                ThreePointArc((-14.342953498, -11.524946279), (-16.106885518, -10.052810325), (-18.342953493, -9.524946279))
                ThreePointArc((-18.342953493, -9.524946279), (-21.081566283, -10.341646145), (-22.925529193, -12.524946279))
                Line((-22.925529193, -12.524946279), (-13.760377803, -12.524946279))
                ThreePointArc((-13.760377803, -12.524946279), (-14.022635061, -12.008033764), (-14.342953498, -11.524946279))
            make_face()
        # profile 19 of 26: a face of its own
        with BuildSketch(Plane(origin=(0, 2.085, 0), x_dir=(1, 0, 0), z_dir=(0, 1, 0)).offset(BOSS_EXTRUDE3_START)):
            with BuildLine():
                Line((16.657046502, -9.524946279), (11.657046502, -9.524946279))
                ThreePointArc((11.657046502, -9.524946279), (14.39565929, -10.341646146), (16.239622197, -12.524946279))
                Line((16.239622197, -12.524946279), (16.657046502, -12.524946279))
                Line((16.657046502, -12.524946279), (16.657046502, -9.524946279))
            make_face()
        # profile 20 of 26: a face of its own
        with BuildSketch(Plane(origin=(0, 2.085, 0), x_dir=(1, 0, 0), z_dir=(0, 1, 0)).offset(BOSS_EXTRUDE3_START)):
            with BuildLine():
                ThreePointArc((16.239622197, -12.524946279), (14.39565929, -10.341646146), (11.657046502, -9.524946279))
                ThreePointArc((11.657046502, -9.524946279), (9.420978525, -10.052810324), (7.657046502, -11.524946279))
                ThreePointArc((7.657046502, -11.524946279), (7.336728066, -12.008033764), (7.074470807, -12.524946279))
                Line((7.074470807, -12.524946279), (16.239622197, -12.524946279))
            make_face()
        # profile 21 of 26: a face of its own
        with BuildSketch(Plane(origin=(0, 2.085, 0), x_dir=(1, 0, 0), z_dir=(0, 1, 0)).offset(BOSS_EXTRUDE3_START)):
            with BuildLine():
                Line((-5.179539495, -11.524946279), (-14.342953498, -11.524946279))
                ThreePointArc((-14.342953498, -11.524946279), (-14.022635061, -12.008033764), (-13.760377803, -12.524946279))
                Line((-13.760377803, -12.524946279), (-9.354549961, -12.524946279))
                add(Edge.make_bspline(
                    [(-9.354549961, -12.524946279), (-9.059875559, -12.370639475), (-8.354121704, -12.038259888), (-6.951354833, -11.661549439), (-5.844015641, -11.530578403), (-5.179539495, -11.524946279)],
                    knots=[0.587657191, 0.587657191, 0.587657191, 0.587657191, 0.679221784, 0.802825172, 0.985869019, 0.985869019, 0.985869019, 0.985869019], degree=3))
            make_face()
        # profile 22 of 26: a face of its own
        with BuildSketch(Plane(origin=(0, 2.085, 0), x_dir=(1, 0, 0), z_dir=(0, 1, 0)).offset(BOSS_EXTRUDE3_START)):
            with BuildLine():
                Line((-13.760377803, -12.524946279), (-22.925529193, -12.524946279))
                ThreePointArc((-22.925529193, -12.524946279), (-23.237489148, -13.503417639), (-23.342953497, -14.524986279))
                ThreePointArc((-23.342953497, -14.524986279), (-21.878490939, -18.060476649), (-18.343003498, -19.524946279))
                ThreePointArc((-18.343003498, -19.524946279), (-15.760986009, -18.806703382), (-13.92078711, -16.858279612))
                ThreePointArc((-13.92078711, -16.858279612), (-13.489561285, -15.726854775), (-13.342953498, -14.524946279))
                ThreePointArc((-13.342953498, -14.524946279), (-13.448421933, -13.50339806), (-13.760377803, -12.524946279))
            make_face()
            with Locations((-18.342953498, -14.524946279)):
                Circle(SKETCH5_R, mode=Mode.SUBTRACT)
        # profile 23 of 26: a face of its own
        with BuildSketch(Plane(origin=(0, 2.085, 0), x_dir=(1, 0, 0), z_dir=(0, 1, 0)).offset(BOSS_EXTRUDE3_START)):
            with BuildLine():
                ThreePointArc((16.657046502, -14.524946279), (16.551578067, -13.50339806), (16.239622197, -12.524946279))
                Line((16.239622197, -12.524946279), (7.074470807, -12.524946279))
                ThreePointArc((7.074470807, -12.524946279), (6.66046873, -14.709907259), (7.234880115, -16.858279612))
                ThreePointArc((7.234880115, -16.858279612), (9.075079014, -18.806703382), (11.657096502, -19.524946279))
                ThreePointArc((11.657096502, -19.524946279), (15.192598086, -18.060462507), (16.657046502, -14.524946279))
            make_face()
            with Locations((11.657046502, -14.524946279)):
                Circle(SKETCH5_R, mode=Mode.SUBTRACT)
        # profile 24 of 26: a face of its own
        with BuildSketch(Plane(origin=(0, 2.085, 0), x_dir=(1, 0, 0), z_dir=(0, 1, 0)).offset(BOSS_EXTRUDE3_START)):
            with BuildLine():
                ThreePointArc((7.074470807, -12.524946279), (7.336728066, -12.008033764), (7.657046502, -11.524946279))
                Line((7.657046502, -11.524946279), (-1.5063675, -11.524946279))
                add(Edge.make_bspline(
                    [(2.668642966, -12.524946279), (2.373968563, -12.370639475), (1.668214709, -12.038259888), (0.265447838, -11.661549439), (-0.841891354, -11.530578403), (-1.5063675, -11.524946279)],
                    knots=[0.587657191, 0.587657191, 0.587657191, 0.587657191, 0.679221784, 0.802825172, 0.985869019, 0.985869019, 0.985869019, 0.985869019], degree=3))
                Line((2.668642966, -12.524946279), (7.074470807, -12.524946279))
            make_face()
        # profile 25 of 26: a face of its own
        with BuildSketch(Plane(origin=(0, 2.085, 0), x_dir=(1, 0, 0), z_dir=(0, 1, 0)).offset(BOSS_EXTRUDE3_START)):
            with BuildLine():
                Line((-9.354549961, -12.524946279), (-13.760377803, -12.524946279))
                ThreePointArc((-13.760377803, -12.524946279), (-13.448421933, -13.50339806), (-13.342953498, -14.524946279))
                ThreePointArc((-13.342953498, -14.524946279), (-13.489561285, -15.726854775), (-13.92078711, -16.858279612))
                add(Edge.make_bspline(
                    [(-13.92078711, -16.858279612), (-13.383745417, -15.856785937), (-12.232094855, -14.272593809), (-10.424029044, -13.117524925), (-9.557996846, -12.631481622), (-9.354549961, -12.524946279)],
                    knots=[0, 0, 0, 0, 0.31493804, 0.524439854, 0.587657191, 0.587657191, 0.587657191, 0.587657191], degree=3))
            make_face()
        # profile 26 of 26: a face of its own
        with BuildSketch(Plane(origin=(0, 2.085, 0), x_dir=(1, 0, 0), z_dir=(0, 1, 0)).offset(BOSS_EXTRUDE3_START)):
            with BuildLine():
                ThreePointArc((7.234880115, -16.858279612), (6.66046873, -14.709907259), (7.074470807, -12.524946279))
                Line((7.074470807, -12.524946279), (2.668642966, -12.524946279))
                add(Edge.make_bspline(
                    [(7.234880115, -16.858279612), (6.697838422, -15.856785937), (5.54618786, -14.272593809), (3.738122049, -13.117524925), (2.872089851, -12.631481622), (2.668642966, -12.524946279)],
                    knots=[0, 0, 0, 0, 0.31493804, 0.524439854, 0.587657191, 0.587657191, 0.587657191, 0.587657191], degree=3))
            make_face()
        extrude(amount=-BOSS_EXTRUDE3_DEPTH)
    add(part.part.scale(1), mode=Mode.REPLACE)  # the faces are merged on a copy

    # Fillet5: read off the stored shape, not the designer's step
    # Fillet5 outline → Fillet5 (add)
    with SkipClean():  # the faces are left unmerged after this step: merging them gives an invalid solid
        with BuildSketch(Plane(origin=(0, 0, 0), x_dir=(1, 0, 0), z_dir=(0, 1, 0)).offset(FILLET5_START)):
            with BuildLine():
                ThreePointArc((16.657046502, -14.524946279), (17.24283294, -13.110732717), (18.657046502, -12.524946279))
                Line((18.657046502, -12.524946279), (16.239622197, -12.524946279))
                ThreePointArc((16.239622197, -12.524946279), (16.551578067, -13.503398061), (16.657046502, -14.524946279))
            make_face()
            with BuildLine():
                ThreePointArc((-25.342953498, -12.524946279), (-23.928739935, -13.110732716), (-23.342953498, -14.524946279))
                ThreePointArc((-23.342953498, -14.524946279), (-23.237485063, -13.503398061), (-22.925529193, -12.524946279))
                Line((-22.925529193, -12.524946279), (-25.342953498, -12.524946279))
            make_face()
            with BuildLine():
                ThreePointArc((-23.342953498, 21.475053721), (-23.928739936, 20.060840158), (-25.342953498, 19.475053721))
                Line((-25.342953498, 19.475053721), (-22.925529193, 19.475053721))
                ThreePointArc((-22.925529193, 19.475053721), (-23.237485063, 20.453505503), (-23.342953498, 21.475053721))
            make_face()
            with BuildLine():
                ThreePointArc((18.657046502, 19.475053721), (17.24283294, 20.060840159), (16.657046502, 21.475053721))
                ThreePointArc((16.657046502, 21.475053721), (16.551578067, 20.453505503), (16.239622197, 19.475053721))
                Line((16.239622197, 19.475053721), (18.657046502, 19.475053721))
            make_face()
        extrude(amount=FILLET5_DEPTH)


solid = part.part
